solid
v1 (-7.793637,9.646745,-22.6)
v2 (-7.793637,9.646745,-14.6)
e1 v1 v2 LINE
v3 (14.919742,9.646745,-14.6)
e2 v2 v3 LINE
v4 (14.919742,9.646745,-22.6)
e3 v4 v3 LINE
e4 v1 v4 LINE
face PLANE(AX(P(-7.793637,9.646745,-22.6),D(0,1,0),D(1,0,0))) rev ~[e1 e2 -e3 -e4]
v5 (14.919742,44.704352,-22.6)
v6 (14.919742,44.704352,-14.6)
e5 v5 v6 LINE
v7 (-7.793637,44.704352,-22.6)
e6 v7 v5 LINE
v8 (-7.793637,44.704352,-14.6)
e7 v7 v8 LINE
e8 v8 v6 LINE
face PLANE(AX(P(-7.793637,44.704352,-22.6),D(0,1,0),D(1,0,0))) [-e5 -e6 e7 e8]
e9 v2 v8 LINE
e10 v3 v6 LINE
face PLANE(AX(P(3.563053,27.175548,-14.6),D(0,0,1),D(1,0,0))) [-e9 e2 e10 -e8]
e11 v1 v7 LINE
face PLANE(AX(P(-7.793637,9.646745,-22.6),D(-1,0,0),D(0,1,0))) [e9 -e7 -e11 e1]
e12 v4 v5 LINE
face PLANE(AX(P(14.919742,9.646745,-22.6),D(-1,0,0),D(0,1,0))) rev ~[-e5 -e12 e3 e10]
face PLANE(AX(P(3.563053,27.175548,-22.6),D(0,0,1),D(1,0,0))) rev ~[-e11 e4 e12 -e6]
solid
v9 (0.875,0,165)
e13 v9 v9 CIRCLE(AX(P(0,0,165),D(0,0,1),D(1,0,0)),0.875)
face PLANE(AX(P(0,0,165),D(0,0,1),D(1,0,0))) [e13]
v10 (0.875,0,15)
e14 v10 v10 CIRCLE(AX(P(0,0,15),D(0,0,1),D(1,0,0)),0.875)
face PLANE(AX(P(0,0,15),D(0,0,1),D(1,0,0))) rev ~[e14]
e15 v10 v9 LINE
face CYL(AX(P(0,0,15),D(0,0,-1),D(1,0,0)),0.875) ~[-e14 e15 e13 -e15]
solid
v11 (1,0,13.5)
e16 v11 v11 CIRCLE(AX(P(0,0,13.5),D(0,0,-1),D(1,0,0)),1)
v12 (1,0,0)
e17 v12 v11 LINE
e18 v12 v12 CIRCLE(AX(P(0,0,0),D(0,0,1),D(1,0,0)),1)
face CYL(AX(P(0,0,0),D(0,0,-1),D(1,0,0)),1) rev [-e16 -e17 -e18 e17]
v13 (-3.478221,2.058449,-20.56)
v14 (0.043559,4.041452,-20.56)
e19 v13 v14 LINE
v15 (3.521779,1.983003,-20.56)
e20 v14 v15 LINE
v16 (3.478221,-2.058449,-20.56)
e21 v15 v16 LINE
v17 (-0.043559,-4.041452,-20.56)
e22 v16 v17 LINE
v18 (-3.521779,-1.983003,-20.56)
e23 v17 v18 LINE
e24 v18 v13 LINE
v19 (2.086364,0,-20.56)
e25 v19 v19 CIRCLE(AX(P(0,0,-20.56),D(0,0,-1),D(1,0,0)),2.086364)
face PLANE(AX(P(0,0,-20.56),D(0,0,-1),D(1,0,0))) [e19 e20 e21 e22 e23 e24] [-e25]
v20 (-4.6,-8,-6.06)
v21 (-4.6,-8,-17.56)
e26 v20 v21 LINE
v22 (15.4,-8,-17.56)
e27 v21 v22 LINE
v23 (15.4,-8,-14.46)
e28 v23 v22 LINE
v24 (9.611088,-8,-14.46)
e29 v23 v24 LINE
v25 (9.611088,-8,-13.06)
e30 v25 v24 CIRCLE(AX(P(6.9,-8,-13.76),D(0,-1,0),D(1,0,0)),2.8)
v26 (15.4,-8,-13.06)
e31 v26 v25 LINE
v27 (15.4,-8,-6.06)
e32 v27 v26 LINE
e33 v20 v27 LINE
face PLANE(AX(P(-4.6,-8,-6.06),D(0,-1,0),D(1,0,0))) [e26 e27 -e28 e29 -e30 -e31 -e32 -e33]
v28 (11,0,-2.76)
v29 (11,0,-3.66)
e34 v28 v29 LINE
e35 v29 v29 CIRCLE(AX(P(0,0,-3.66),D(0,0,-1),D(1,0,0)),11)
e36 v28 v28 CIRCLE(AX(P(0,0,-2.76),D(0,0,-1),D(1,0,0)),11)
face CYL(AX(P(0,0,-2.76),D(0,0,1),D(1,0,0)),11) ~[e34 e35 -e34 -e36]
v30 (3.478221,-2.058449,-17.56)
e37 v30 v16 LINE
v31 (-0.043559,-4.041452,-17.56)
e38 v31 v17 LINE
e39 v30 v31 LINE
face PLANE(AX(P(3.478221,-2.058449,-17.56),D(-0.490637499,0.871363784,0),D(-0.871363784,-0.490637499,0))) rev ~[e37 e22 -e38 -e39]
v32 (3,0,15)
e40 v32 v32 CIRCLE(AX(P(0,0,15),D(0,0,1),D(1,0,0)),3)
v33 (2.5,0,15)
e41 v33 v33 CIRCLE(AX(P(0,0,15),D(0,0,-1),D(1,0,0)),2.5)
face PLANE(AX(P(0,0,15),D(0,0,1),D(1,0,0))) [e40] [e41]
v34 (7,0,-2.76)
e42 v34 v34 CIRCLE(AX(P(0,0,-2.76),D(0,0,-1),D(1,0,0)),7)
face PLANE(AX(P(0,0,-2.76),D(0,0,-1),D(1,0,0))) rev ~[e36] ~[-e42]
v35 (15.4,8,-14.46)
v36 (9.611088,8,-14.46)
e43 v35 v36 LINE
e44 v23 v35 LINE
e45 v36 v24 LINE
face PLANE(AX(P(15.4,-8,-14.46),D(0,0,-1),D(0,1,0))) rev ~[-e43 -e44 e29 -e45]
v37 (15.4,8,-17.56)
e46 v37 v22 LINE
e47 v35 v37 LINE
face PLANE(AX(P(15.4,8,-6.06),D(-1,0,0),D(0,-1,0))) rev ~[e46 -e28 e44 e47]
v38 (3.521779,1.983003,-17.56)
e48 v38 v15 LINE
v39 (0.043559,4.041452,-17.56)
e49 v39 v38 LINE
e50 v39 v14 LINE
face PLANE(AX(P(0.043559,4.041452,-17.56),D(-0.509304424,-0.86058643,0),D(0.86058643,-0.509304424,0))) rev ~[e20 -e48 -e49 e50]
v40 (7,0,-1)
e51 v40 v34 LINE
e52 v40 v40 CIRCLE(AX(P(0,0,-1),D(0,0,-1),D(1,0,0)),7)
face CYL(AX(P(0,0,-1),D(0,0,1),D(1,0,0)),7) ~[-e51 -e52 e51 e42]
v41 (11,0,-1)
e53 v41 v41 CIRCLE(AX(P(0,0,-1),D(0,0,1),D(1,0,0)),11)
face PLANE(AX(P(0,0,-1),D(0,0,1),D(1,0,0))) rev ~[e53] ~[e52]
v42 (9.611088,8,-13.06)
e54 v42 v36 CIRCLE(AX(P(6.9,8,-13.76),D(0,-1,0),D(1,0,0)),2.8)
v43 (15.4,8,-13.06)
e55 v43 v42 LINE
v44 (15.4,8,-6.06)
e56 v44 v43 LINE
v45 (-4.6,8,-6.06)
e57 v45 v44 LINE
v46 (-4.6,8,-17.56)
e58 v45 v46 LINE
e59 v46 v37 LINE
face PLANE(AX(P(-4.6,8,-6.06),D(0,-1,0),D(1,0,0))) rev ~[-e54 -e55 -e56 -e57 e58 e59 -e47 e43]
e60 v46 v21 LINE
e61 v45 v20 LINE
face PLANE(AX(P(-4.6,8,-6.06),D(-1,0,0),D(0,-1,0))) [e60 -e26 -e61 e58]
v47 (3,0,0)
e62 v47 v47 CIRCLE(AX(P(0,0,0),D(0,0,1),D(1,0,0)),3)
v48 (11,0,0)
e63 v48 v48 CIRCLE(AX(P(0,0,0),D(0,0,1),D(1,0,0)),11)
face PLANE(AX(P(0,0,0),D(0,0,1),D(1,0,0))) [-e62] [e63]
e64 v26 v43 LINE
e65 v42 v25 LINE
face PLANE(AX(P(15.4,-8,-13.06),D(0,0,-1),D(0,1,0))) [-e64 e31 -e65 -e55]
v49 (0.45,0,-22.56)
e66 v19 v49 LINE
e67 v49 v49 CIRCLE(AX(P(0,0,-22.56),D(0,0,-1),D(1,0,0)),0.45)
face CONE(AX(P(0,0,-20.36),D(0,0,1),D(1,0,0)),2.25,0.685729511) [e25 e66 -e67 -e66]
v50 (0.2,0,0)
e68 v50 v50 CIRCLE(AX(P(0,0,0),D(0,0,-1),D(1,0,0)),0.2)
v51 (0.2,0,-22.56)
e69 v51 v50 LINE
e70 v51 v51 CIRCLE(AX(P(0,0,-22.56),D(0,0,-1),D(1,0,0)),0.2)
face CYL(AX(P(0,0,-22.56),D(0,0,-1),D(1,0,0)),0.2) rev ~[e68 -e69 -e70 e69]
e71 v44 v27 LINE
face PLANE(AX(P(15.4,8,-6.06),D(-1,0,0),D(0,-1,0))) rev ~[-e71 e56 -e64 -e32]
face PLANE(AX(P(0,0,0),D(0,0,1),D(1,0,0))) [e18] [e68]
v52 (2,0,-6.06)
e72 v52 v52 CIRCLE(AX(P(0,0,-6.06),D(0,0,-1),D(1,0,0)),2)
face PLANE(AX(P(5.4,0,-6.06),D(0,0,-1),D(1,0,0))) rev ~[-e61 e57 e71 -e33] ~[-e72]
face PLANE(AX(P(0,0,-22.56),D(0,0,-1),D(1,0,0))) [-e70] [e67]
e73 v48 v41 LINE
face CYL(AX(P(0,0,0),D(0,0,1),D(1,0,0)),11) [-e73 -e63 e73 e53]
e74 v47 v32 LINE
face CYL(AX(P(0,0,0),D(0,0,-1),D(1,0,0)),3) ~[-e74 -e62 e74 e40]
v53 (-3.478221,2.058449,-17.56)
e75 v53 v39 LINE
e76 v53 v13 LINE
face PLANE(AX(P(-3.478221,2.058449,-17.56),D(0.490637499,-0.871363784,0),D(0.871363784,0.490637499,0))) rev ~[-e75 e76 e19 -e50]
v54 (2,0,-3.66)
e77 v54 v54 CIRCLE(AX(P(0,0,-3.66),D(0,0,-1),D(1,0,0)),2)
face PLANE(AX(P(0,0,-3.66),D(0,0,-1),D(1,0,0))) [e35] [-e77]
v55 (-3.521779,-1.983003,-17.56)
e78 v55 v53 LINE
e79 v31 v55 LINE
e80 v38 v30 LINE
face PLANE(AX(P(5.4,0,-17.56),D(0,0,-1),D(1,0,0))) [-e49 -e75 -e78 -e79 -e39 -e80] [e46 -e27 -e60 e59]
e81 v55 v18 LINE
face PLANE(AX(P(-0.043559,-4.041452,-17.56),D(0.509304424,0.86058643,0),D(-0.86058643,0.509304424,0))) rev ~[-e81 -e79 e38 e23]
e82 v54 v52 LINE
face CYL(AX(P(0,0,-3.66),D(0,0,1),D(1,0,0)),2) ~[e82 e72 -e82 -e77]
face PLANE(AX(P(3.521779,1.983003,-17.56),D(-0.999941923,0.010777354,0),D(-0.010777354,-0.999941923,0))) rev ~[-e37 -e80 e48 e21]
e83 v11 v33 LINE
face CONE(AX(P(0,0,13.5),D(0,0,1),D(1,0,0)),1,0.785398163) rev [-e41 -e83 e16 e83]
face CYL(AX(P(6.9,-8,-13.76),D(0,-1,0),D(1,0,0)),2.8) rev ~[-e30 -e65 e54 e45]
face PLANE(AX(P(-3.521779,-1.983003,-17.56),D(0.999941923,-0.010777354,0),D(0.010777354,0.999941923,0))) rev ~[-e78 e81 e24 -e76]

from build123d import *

# Parameters (mm, degrees)
F0_R      = 11
F1_DEPTH  = 1
F2_R      = 7
F3_DEPTH  = 1.76
F4_R      = 11
F5_DEPTH  = 0.9
F6_R      = 2
F7_DEPTH  = 2.4
F8_W      = 20
F8_H      = 16
F9_DEPTH  = 11.5
F10_R     = 2.8
F11_DEPTH = 19.001
F12_W     = 16
F12_H     = 1.4
F13_DEPTH = 5.7899116577
F15_DEPTH = 3
F16_R     = 2.25
F17_DEPTH = 2
F19_R     = 3
F20_DEPTH = 15
F21_R     = 0.2
F22_DEPTH = 37.561
F23_R     = 1
F24_DEPTH = 15.001
F25_SIZE  = 1.5
F27_W     = 22.7133790031
F27_H     = 35.0576061755
F28_DEPTH = 8
F30_R     = 0.875
F31_DEPTH = 150


# Not quite as in the source:
# - a fillet or chamfer that OpenCascade refuses, or shapes differently, is made with other operations: its cross-section is extruded or revolved along the edge and cut away or added


with BuildPart() as f1:
    # F0 (on Top) → F1 (new body)
    with BuildSketch(Plane.XY):
        Circle(F0_R)
    extrude(amount=-F1_DEPTH)

    # F2 (on face) → F3 (join)
    with BuildSketch(Plane(origin=(0, 0, -1), x_dir=(1, 0, 0), z_dir=(0, 0, -1))):
        Circle(F2_R)
    extrude(amount=F3_DEPTH)

    # F4 (on face) → F5 (join)
    with BuildSketch(Plane(origin=(0, 0, -2.76), x_dir=(1, 0, 0), z_dir=(0, 0, -1))):
        Circle(F4_R)
    extrude(amount=F5_DEPTH)

    # F6 (on face) → F7 (join)
    with BuildSketch(Plane(origin=(0, 0, -3.66), x_dir=(1, 0, 0), z_dir=(0, 0, -1))):
        Circle(F6_R)
    extrude(amount=F7_DEPTH)

    # F8 (on face) → F9 (join)
    with BuildSketch(Plane(origin=(0, 0, -6.06), x_dir=(1, 0, 0), z_dir=(0, 0, -1))):
        with Locations((5.4, 0)):
            Rectangle(F8_W, F8_H)
    extrude(amount=F9_DEPTH)

    # F10 (on face) → F11 (cut, through all)
    with BuildSketch(Plane.XZ.offset(8)):
        with Locations((6.9, -13.76)):
            Circle(F10_R)
    extrude(amount=-F11_DEPTH, mode=Mode.SUBTRACT)

    # F12 (on face) → F13 (cut, through all)
    with BuildSketch(Plane.YZ.offset(15.4)):
        with Locations((0, -13.76)):
            Rectangle(F12_W, F12_H)
    extrude(amount=-F13_DEPTH, mode=Mode.SUBTRACT)

    # F14 (on face) → F15 (join)
    with BuildSketch(Plane(origin=(0, 0, -17.56), x_dir=(1, 0, 0), z_dir=(0, 0, -1))):
        Polygon((0.0435586886, -4.0414518843), (3.5217793443, -1.9830030113), (3.4782206557, 2.058448873), (-0.0435586886, 4.0414518843), (-3.5217793443, 1.9830030113), (-3.4782206557, -2.058448873), align=None)
    extrude(amount=F15_DEPTH)

    # F16 (on face) → F17 (join)
    with BuildSketch(Plane(origin=(0, 0, -20.56), x_dir=(1, 0, 0), z_dir=(0, 0, -1))):
        Circle(F16_R)
    extrude(amount=F17_DEPTH)

    # F18: chamfer of 1.8 x 2.2 on 1 edges, made by hand


with BuildPart() as f18_tool2:
    # F18_s3 → F18_t4 (revolve)
    with BuildSketch(Plane.XZ):
        Polygon((2.25, -20.36), (0.45, -22.56), (2.25, -22.56), align=None)
    revolve(axis=Axis((0, 0, -22.56), (0, 0, -1)))

    split(bisect_by=Plane.XY.offset(-20.56), keep=Keep.BOTTOM)


with BuildPart() as f1_1:
    add(f1.part)

    # F18_t1: cut F18_tool2
    add(f18_tool2.part, mode=Mode.SUBTRACT)

    # F19 (on face) → F20 (join)
    with BuildSketch(Plane.XY):
        Circle(F19_R)
    extrude(amount=F20_DEPTH)

    # F21 (on face) → F22 (cut, through all)
    with BuildSketch(Plane(origin=(0, 0, -22.56), x_dir=(1, 0, 0), z_dir=(0, 0, -1))):
        Circle(F21_R)
    extrude(amount=-F22_DEPTH, mode=Mode.SUBTRACT)

    # F23 (on face) → F24 (cut, through all)
    with BuildSketch(Plane.XY):
        Circle(F23_R)
    extrude(amount=F24_DEPTH, mode=Mode.SUBTRACT)

    # F25
    f25_edges = [f1_1.edges().sort_by_distance(p)[0] for p in [
        (-1, 0, 15),
    ]]
    chamfer(f25_edges, length=F25_SIZE)


with BuildPart() as f28:
    # F27 (on offset) → F28 (new body)
    with BuildSketch(Plane.XY.offset(-22.6)):
        with Locations((3.563052509, 27.1755484864)):
            Rectangle(F27_W, F27_H)
    extrude(amount=F28_DEPTH)


with BuildPart() as f31:
    # F30 (on offset) → F31 (new body)
    with BuildSketch(Plane.XY.offset(15)):
        Circle(F30_R)
    extrude(amount=F31_DEPTH)


solid = Compound([f1_1.part, f28.part, f31.part])
